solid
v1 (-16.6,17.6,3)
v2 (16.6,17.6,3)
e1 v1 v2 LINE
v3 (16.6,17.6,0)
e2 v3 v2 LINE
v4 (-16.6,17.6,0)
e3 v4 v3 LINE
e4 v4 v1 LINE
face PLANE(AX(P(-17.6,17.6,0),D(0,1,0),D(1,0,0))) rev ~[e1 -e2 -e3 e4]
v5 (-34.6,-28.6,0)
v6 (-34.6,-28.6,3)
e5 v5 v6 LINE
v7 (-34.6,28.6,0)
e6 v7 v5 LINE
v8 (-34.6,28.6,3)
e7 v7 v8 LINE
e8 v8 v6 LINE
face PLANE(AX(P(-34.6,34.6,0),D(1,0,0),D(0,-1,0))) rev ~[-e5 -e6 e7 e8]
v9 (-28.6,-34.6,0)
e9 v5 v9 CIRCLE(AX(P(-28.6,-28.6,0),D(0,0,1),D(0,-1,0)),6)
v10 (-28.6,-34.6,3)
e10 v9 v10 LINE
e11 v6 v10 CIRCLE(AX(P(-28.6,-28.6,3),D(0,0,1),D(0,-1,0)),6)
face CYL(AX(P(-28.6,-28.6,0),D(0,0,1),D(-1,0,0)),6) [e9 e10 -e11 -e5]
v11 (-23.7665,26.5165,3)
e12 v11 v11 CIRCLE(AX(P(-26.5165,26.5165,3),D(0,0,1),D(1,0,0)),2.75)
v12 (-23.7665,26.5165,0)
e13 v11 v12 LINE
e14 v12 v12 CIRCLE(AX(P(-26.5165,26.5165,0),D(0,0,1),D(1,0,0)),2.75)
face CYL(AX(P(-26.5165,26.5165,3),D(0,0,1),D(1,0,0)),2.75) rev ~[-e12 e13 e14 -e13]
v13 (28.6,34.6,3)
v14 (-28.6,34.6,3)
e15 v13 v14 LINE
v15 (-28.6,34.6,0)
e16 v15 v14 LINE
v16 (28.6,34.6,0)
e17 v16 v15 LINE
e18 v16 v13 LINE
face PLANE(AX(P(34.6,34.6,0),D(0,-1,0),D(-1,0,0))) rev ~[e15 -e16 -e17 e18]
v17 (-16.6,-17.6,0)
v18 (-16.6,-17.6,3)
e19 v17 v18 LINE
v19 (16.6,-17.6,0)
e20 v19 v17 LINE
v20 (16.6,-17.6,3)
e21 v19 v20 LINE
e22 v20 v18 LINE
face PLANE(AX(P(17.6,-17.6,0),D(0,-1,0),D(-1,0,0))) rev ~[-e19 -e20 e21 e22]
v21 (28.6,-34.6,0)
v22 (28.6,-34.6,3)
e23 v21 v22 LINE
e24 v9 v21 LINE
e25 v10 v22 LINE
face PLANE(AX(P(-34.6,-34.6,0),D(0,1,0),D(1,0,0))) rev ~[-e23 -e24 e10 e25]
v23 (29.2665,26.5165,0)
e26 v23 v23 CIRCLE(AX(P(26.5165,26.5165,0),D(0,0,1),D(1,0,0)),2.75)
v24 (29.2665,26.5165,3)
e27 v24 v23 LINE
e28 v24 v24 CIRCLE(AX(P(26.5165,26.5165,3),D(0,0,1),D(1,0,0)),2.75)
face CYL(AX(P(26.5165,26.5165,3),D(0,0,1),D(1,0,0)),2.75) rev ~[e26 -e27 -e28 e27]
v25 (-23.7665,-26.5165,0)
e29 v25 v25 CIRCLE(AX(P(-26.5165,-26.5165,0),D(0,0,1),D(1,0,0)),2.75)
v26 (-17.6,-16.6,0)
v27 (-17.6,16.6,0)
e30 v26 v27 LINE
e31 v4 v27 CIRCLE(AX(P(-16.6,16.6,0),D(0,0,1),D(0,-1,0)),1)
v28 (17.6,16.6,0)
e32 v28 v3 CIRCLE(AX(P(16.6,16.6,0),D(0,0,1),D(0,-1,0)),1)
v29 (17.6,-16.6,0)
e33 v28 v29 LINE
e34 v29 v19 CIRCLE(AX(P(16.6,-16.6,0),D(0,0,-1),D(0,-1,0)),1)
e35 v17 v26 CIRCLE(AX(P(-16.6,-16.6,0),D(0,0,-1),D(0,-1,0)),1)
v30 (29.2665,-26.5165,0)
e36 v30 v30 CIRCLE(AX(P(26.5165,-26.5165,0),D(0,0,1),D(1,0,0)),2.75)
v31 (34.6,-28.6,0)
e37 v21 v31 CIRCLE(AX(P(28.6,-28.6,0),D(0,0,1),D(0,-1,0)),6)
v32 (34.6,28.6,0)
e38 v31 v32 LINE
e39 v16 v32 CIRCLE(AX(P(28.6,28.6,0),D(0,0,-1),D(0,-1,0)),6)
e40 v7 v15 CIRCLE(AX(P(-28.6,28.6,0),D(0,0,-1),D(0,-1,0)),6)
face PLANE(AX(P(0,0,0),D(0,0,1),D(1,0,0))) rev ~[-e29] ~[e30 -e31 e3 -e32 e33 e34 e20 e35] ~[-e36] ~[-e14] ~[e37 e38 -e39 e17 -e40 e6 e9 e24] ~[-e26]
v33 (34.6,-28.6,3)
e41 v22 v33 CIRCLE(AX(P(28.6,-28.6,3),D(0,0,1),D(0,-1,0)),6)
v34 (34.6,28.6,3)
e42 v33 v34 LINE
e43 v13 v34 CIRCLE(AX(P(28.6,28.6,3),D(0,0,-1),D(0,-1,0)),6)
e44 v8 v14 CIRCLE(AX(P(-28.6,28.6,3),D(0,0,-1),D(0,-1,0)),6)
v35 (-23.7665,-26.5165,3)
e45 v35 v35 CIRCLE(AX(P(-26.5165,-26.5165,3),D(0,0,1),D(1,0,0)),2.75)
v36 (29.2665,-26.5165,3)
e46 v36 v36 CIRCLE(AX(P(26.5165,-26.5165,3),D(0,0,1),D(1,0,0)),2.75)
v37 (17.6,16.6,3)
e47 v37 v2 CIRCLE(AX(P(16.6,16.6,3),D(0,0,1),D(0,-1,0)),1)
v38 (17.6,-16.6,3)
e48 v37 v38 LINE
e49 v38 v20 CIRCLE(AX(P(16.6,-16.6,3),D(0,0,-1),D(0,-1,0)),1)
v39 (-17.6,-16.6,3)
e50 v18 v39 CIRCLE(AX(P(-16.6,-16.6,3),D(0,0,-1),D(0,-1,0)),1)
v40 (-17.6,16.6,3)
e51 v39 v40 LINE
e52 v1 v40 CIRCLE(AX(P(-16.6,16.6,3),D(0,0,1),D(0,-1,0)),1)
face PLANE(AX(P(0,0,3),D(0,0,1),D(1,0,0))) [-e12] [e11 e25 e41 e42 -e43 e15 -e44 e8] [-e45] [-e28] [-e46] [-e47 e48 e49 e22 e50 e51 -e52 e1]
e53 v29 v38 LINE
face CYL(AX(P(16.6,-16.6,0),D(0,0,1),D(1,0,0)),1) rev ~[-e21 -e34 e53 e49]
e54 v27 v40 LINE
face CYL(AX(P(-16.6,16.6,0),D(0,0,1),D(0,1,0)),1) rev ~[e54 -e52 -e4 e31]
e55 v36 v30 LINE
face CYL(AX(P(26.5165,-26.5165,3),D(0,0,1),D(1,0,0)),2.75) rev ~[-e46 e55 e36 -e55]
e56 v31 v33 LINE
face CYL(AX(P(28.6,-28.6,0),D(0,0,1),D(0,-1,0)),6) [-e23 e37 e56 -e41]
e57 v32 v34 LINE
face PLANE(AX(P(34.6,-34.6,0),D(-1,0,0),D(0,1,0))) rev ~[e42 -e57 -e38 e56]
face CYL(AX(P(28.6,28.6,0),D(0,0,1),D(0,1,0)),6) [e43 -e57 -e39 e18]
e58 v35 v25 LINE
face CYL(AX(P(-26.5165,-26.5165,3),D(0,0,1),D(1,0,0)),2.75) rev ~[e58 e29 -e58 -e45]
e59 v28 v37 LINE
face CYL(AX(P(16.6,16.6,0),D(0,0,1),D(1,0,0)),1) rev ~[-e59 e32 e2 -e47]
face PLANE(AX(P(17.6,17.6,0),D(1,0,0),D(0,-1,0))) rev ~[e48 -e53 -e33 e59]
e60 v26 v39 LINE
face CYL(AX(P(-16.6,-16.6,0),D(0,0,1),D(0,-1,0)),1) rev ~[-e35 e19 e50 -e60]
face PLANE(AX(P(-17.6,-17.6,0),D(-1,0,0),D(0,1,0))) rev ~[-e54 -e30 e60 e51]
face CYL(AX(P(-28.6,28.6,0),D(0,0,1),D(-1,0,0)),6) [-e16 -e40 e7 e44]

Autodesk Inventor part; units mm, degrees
ref_plane "YZ Plane" through (0, 0, 0) normal (1, 0, 0) x (0, 1, 0)
ref_plane "XZ Plane" through (0, 0, 0) normal (0, 1, 0) x (-1, 0, 0)
ref_plane "XY Plane" through (0, 0, 0) normal (0, 0, 1) x (1, 0, 0)
sketch "Sketch1" plane through (0, 0, 0) normal (0, 0, 1) x (1, 0, 0)
  line L0 (-34.6, -34.6) -> (34.6, -34.6)
  line L1 (34.6, -34.6) -> (34.6, 34.6)
  line L2 (34.6, 34.6) -> (-34.6, 34.6)
  line L3 (-34.6, 34.6) -> (-34.6, -34.6)
  line L4 (-34.6, -34.6) -> (34.6, 34.6) construction
  line L5 (34.6, -34.6) -> (-34.6, 34.6) construction
  line L6 (17.6, -17.6) -> (-17.6, -17.6)
  line L7 (-17.6, -17.6) -> (-17.6, 17.6)
  line L8 (-17.6, 17.6) -> (17.6, 17.6)
  line L9 (17.6, 17.6) -> (17.6, -17.6)
  line L10 (17.6, -17.6) -> (-17.6, 17.6) construction
  line L11 (-17.6, -17.6) -> (17.6, 17.6) construction
  point P0 (0, 0)
  dimension "d172" = 35.2
  dimension "d181" = 17
  dimension "d187" = 17
extrude "Plate5" add sketch "Sketch1" along normal blind 3
sketch "Sketch9" plane through (0, 0, 3) normal (0, 0, 1) x (1, 0, 0)
  circle A0 centre (26.5165, -26.5165) radius 2.75
  line L0 (26.5165, 26.5165) -> (-26.5165, 26.5165) construction
  line L1 (-26.5165, 26.5165) -> (-26.5165, -26.5165) construction
  line L2 (-26.5165, -26.5165) -> (26.5165, -26.5165) construction
  line L3 (26.5165, -26.5165) -> (26.5165, 26.5165) construction
  line L4 (26.5165, 26.5165) -> (-26.5165, -26.5165) construction
  line L5 (-26.5165, 26.5165) -> (26.5165, -26.5165) construction
  circle A1 centre (-26.5165, -26.5165) radius 2.75
  circle A2 centre (26.5165, 26.5165) radius 2.75
  circle A3 centre (-26.5165, 26.5165) radius 2.75
  circle A4 centre (0, 0) radius 37.5 construction
  line L6 (-17.6, -17.6) -> (-17.6, 17.6) projected
  line L7 (-17.6, 17.6) -> (17.6, 17.6) projected
  line L8 (17.6, 17.6) -> (17.6, -17.6) projected
  line L9 (17.6, -17.6) -> (-17.6, -17.6) projected
  line L10 (34.6, -34.6) -> (-34.6, -34.6) projected
  line L11 (34.6, 34.6) -> (34.6, -34.6) projected
  line L12 (-34.6, 34.6) -> (34.6, 34.6) projected
  line L13 (-34.6, -34.6) -> (-34.6, 34.6) projected
  line L14 (-15, 15) -> (15, 15) construction
  line L15 (15, 15) -> (15, -15) construction
  line L16 (15, -15) -> (-15, -15) construction
  line L17 (-15, -15) -> (-15, 15) construction
  line L18 (-15, -15) -> (15, 15) construction
  dimension "d188" = 75
  dimension "d174" = 5.5
  dimension "d184" = 30
  dimension "d185" = 30
  dimension "d186" = 16.2868
extrude "Cut2" cut sketch "Sketch9" against normal blind 3 contours A0 | A1 | A2 | A3
fillet "Corner Round1" radius 6 4 edges at (34.6, 34.6, 1.5) (-34.6, 34.6, 1.5) (-34.6, -34.6, 1.5) (34.6, -34.6, 1.5)
fillet "Corner Round2" radius 1 4 edges at (-17.6, 17.6, 1.5) (-17.6, -17.6, 1.5) (17.6, -17.6, 1.5) (17.6, 17.6, 1.5)
properties part number "ANP 1425 FDS Way FLANGE" material "Stainless Steel"
